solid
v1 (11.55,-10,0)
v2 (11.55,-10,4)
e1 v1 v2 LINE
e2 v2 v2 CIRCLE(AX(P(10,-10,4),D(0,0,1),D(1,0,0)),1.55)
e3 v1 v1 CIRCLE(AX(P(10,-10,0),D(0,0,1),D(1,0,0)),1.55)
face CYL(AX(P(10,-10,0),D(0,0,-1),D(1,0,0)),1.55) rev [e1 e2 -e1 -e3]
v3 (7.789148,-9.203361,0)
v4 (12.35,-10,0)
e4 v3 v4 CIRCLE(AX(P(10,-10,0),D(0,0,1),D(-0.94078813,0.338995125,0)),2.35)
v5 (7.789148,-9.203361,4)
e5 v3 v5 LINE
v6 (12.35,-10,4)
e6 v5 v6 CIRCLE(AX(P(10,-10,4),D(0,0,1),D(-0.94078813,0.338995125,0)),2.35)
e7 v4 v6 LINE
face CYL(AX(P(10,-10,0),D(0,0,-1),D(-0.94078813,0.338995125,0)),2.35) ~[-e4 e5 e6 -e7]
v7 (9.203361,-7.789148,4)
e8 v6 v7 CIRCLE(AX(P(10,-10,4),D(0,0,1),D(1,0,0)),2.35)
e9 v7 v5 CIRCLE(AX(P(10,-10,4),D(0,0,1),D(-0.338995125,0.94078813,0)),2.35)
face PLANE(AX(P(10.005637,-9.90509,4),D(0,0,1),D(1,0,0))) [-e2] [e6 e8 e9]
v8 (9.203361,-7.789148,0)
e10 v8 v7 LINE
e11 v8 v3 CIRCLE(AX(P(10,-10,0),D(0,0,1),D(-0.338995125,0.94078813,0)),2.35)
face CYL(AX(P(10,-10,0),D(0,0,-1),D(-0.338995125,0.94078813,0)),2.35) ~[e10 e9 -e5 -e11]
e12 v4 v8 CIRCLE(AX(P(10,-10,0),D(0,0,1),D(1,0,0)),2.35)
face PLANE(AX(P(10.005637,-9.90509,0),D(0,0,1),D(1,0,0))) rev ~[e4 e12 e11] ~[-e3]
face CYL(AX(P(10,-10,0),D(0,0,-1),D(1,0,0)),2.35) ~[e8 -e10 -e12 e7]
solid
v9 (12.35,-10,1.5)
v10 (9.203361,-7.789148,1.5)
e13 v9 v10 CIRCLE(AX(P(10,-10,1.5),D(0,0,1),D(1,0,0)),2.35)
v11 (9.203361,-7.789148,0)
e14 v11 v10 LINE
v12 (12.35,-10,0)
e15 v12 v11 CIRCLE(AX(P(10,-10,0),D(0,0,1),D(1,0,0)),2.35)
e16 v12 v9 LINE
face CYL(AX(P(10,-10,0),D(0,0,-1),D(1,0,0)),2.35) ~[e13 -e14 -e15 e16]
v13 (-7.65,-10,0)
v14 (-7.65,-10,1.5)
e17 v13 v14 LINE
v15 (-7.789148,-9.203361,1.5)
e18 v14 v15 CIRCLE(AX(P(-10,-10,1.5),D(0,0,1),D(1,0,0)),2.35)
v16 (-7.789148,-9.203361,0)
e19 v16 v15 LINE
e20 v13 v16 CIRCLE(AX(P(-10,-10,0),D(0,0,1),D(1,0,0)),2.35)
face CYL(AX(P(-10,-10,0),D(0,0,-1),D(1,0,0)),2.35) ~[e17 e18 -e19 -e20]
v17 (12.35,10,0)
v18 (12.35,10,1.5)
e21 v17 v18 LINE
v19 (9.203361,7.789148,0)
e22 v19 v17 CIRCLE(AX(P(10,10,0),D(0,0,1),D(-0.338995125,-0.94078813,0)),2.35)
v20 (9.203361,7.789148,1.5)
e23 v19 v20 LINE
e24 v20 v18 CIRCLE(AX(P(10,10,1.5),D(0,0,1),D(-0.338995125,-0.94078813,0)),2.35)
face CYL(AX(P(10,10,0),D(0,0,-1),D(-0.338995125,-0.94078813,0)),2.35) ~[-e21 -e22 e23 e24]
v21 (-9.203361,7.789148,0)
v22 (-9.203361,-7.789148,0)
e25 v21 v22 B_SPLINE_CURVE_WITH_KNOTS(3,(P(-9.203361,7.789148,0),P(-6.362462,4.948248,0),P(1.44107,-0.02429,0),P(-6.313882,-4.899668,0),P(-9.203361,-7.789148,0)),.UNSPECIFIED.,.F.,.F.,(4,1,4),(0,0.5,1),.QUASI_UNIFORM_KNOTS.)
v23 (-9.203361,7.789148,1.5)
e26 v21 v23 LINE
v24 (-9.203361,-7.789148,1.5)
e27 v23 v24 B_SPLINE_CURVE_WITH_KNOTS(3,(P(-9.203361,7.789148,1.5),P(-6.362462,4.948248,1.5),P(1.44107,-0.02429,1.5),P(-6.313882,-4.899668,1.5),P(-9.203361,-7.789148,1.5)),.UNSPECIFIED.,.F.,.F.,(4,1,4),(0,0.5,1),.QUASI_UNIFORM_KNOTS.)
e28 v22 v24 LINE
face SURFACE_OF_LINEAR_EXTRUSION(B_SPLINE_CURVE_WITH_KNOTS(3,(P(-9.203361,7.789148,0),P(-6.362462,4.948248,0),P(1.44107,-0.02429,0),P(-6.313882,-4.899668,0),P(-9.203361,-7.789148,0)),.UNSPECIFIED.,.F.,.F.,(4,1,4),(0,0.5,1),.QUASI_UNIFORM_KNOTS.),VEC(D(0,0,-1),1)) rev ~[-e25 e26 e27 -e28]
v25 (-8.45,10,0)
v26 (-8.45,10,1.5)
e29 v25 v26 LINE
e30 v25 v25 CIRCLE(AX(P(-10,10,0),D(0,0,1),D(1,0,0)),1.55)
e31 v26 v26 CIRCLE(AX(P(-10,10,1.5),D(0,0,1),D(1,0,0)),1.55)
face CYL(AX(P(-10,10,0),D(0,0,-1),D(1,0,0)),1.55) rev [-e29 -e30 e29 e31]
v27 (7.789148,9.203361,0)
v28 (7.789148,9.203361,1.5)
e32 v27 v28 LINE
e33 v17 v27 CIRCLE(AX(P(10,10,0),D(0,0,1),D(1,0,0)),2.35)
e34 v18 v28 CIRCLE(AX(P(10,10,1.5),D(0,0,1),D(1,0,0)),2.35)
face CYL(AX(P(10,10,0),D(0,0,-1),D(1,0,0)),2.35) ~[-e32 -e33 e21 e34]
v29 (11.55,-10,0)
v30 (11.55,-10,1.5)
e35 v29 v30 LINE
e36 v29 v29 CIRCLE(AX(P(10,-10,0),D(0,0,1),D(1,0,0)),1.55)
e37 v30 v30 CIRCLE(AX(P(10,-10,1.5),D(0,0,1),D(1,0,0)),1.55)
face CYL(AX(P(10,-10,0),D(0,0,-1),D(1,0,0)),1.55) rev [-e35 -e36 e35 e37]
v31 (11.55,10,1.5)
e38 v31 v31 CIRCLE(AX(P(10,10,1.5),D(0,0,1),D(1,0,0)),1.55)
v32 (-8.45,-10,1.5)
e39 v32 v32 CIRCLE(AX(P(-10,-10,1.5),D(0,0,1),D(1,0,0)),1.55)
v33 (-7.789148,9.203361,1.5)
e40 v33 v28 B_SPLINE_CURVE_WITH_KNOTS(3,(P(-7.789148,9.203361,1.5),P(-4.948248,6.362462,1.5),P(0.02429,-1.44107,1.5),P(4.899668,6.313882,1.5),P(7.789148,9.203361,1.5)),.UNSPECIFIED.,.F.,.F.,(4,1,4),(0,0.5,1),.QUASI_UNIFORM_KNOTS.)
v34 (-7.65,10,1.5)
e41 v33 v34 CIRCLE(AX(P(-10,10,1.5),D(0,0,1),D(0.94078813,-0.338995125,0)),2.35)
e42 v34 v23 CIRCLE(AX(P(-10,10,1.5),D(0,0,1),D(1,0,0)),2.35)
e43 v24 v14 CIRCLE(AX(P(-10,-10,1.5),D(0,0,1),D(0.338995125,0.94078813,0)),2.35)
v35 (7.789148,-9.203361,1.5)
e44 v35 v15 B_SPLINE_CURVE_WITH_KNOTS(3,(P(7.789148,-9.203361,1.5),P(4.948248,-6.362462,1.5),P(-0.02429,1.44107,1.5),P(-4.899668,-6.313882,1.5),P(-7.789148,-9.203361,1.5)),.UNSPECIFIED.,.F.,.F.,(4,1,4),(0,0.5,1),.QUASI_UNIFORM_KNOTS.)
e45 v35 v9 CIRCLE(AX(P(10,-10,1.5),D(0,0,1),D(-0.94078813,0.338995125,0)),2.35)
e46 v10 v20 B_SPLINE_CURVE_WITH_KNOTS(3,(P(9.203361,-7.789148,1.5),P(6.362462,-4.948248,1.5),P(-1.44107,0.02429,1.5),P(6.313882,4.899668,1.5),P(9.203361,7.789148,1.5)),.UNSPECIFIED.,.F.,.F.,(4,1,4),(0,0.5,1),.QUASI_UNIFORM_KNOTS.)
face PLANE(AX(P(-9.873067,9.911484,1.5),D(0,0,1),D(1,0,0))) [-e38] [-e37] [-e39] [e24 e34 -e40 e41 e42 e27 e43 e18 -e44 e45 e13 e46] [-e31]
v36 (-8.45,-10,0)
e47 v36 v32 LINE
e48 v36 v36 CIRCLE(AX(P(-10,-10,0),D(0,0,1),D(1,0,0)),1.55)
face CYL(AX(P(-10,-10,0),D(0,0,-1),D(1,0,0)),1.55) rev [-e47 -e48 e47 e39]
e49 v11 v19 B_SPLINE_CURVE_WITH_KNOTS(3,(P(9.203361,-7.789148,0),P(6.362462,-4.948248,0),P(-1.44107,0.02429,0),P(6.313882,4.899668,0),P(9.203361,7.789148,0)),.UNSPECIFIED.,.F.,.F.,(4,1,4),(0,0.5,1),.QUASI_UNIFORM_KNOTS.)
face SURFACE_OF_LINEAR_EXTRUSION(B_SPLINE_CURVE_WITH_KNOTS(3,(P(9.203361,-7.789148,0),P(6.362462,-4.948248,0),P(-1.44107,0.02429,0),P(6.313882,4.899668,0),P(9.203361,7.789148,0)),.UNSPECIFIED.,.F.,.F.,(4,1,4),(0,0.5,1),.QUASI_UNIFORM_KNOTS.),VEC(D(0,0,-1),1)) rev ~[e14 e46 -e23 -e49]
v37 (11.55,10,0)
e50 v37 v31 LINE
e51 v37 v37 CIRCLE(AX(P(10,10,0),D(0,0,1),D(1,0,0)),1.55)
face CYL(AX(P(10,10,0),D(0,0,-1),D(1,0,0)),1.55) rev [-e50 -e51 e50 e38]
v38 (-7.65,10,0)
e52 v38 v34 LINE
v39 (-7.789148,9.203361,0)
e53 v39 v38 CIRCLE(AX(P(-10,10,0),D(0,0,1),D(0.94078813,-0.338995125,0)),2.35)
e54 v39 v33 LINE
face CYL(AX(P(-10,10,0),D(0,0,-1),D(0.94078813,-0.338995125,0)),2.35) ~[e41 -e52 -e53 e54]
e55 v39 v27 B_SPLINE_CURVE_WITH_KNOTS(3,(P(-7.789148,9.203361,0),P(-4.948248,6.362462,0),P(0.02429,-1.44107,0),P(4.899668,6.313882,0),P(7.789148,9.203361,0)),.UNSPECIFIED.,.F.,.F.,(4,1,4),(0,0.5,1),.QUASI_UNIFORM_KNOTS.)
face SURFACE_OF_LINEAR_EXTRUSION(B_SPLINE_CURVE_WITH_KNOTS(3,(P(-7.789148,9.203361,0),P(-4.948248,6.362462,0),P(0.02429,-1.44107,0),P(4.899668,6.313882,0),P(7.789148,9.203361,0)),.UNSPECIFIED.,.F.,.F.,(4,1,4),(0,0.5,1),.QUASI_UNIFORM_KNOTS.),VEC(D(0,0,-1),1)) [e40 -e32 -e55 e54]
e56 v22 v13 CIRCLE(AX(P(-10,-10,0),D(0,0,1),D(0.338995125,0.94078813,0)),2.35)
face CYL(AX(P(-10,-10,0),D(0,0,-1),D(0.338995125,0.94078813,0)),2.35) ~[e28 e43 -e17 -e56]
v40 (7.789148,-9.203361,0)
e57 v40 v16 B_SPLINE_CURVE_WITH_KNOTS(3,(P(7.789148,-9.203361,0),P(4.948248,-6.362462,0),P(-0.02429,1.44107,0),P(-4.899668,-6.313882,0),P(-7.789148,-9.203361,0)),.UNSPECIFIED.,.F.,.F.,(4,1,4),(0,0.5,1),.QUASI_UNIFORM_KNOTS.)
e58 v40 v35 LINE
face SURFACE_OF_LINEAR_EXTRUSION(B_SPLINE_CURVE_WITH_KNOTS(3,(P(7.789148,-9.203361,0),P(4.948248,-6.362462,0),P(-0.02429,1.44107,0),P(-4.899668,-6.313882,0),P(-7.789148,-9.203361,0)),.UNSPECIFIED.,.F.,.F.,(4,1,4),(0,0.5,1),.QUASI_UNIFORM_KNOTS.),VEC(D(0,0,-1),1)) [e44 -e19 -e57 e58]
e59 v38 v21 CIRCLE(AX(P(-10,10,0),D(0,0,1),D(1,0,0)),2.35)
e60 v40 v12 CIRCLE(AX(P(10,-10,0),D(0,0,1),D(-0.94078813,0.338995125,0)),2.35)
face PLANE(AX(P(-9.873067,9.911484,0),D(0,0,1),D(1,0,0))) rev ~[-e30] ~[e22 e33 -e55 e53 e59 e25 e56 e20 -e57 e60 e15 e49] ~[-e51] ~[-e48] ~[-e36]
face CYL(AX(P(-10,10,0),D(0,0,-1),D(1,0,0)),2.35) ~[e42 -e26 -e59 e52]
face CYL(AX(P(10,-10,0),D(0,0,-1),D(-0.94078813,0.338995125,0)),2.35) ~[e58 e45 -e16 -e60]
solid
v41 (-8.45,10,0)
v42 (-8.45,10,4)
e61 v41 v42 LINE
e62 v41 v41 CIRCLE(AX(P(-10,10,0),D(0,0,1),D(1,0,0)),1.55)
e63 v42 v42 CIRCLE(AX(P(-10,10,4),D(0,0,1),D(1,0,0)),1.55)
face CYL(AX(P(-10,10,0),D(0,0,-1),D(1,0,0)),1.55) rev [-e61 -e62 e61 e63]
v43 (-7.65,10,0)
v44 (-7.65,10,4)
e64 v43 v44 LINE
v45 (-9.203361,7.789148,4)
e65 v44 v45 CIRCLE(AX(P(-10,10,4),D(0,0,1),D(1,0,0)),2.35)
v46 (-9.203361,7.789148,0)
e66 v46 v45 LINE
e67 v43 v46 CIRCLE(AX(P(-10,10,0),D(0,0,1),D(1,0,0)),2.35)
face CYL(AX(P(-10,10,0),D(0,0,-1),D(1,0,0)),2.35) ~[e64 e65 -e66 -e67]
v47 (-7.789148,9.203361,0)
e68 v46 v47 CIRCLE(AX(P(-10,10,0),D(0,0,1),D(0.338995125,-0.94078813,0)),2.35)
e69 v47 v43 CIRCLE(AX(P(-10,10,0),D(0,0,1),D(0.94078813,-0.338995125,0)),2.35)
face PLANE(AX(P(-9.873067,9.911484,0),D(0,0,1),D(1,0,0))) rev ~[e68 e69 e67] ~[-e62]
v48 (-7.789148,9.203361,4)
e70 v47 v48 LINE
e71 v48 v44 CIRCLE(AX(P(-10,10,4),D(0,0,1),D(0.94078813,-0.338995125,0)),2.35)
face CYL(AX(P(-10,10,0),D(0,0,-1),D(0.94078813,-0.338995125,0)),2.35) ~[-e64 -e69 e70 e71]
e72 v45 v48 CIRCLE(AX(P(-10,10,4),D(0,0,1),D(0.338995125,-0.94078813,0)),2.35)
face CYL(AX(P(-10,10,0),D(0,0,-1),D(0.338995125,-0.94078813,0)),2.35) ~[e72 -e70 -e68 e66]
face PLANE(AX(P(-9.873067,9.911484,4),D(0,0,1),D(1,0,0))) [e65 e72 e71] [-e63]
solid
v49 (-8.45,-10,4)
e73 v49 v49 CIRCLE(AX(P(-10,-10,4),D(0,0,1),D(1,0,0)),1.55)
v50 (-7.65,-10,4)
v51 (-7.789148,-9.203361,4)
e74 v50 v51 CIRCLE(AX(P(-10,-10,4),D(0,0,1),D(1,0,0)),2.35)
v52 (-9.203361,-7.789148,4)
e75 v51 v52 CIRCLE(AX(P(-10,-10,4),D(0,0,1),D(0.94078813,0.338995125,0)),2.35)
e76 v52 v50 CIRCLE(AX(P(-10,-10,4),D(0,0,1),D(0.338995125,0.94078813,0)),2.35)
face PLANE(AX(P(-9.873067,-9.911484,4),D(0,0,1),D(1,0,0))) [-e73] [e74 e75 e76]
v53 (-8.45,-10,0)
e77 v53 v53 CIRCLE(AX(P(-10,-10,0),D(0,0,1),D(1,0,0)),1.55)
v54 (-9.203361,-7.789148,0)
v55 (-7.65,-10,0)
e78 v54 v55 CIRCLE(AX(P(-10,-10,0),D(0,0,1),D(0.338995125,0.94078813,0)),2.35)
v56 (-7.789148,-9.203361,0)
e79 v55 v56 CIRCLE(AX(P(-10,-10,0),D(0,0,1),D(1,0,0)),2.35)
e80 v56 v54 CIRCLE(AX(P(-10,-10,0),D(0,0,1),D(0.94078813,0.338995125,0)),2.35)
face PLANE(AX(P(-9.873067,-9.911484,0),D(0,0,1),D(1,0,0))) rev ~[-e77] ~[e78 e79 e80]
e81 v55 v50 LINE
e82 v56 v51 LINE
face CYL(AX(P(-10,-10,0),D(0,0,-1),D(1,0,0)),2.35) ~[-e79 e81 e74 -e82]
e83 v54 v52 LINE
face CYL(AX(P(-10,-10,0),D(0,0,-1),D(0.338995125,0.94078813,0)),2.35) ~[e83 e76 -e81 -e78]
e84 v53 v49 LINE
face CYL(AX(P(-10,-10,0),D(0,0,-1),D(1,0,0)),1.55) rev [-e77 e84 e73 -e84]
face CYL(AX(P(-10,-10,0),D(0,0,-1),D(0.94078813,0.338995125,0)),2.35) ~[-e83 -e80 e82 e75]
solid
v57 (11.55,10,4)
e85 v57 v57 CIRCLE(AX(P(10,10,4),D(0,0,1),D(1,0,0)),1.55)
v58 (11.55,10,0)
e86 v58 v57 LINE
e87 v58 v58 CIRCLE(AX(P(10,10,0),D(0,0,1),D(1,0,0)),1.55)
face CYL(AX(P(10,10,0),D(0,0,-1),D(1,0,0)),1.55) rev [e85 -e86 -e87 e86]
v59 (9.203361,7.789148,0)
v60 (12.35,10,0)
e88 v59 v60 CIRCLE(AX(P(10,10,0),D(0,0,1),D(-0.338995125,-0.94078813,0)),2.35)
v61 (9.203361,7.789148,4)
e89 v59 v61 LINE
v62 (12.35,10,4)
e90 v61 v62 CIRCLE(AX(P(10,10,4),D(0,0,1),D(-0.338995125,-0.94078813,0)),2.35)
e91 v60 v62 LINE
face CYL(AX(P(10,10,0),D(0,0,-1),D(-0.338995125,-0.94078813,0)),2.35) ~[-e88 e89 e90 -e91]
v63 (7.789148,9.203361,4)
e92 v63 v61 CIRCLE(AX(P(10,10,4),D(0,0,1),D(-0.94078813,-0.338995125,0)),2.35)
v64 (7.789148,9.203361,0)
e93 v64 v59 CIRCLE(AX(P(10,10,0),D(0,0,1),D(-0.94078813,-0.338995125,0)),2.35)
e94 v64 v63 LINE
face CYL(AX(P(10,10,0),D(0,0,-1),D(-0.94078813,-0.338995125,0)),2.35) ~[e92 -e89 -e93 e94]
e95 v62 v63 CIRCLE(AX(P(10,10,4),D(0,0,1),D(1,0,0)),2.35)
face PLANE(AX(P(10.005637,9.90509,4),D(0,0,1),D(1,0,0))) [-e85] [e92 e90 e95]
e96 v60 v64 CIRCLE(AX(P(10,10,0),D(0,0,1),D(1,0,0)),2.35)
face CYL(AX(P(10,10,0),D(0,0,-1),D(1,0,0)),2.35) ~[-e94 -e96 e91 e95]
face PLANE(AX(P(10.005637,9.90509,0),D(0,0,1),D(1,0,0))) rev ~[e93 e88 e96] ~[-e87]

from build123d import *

# Parameters (mm, degrees)
F0_R     = 1.55
F1_DEPTH = 4
F2_DEPTH = 1.5


with BuildPart() as f1:
    # F0 (on Top) → F1 (new body)
    with BuildSketch(Plane.XY):
        with BuildLine():
            ThreePointArc((-7.7891478946, 9.203361457), (-7.6850483323, 9.5956501809), (-7.65, 10))
            ThreePointArc((-7.65, 10), (-11.9228365214, 11.3509995233), (-9.203361457, 7.7891478946))
            ThreePointArc((-9.203361457, 7.7891478946), (-8.3382990642, 8.3382990642), (-7.7891478946, 9.203361457))
        make_face()
        with Locations((-10, 10)):
            Circle(F0_R, mode=Mode.SUBTRACT)
    extrude(amount=F1_DEPTH)


with BuildPart() as f1b:
    # F0 (on Top) → F1, piece 2 (new body)
    with BuildSketch(Plane.XY):
        with BuildLine():
            ThreePointArc((-7.7891478946, -9.203361457), (-8.3382990642, -8.3382990642), (-9.203361457, -7.7891478946))
            ThreePointArc((-9.203361457, -7.7891478946), (-11.9228365214, -11.3509995233), (-7.65, -10))
            ThreePointArc((-7.65, -10), (-7.6850483323, -9.5956501809), (-7.7891478946, -9.203361457))
        make_face()
        with Locations((-10, -10)):
            Circle(F0_R, mode=Mode.SUBTRACT)
    extrude(amount=F1_DEPTH)


with BuildPart() as f1c:
    # F0 (on Top) → F1, piece 3 (new body)
    with BuildSketch(Plane.XY):
        with BuildLine():
            ThreePointArc((12.35, 10), (9.5956501809, 12.3149516677), (7.7891478946, 9.203361457))
            ThreePointArc((7.7891478946, 9.203361457), (8.3382990642, 8.3382990642), (9.203361457, 7.7891478946))
            ThreePointArc((9.203361457, 7.7891478946), (11.3509995233, 8.0771634786), (12.35, 10))
        make_face()
        with Locations((10, 10)):
            Circle(F0_R, mode=Mode.SUBTRACT)
    extrude(amount=F1_DEPTH)


with BuildPart() as f1d:
    # F0 (on Top) → F1, piece 4 (new body)
    with BuildSketch(Plane.XY):
        with BuildLine():
            ThreePointArc((9.203361457, -7.7891478946), (8.3382990642, -8.3382990642), (7.7891478946, -9.203361457))
            ThreePointArc((7.7891478946, -9.203361457), (9.5956501809, -12.3149516677), (12.35, -10))
            ThreePointArc((12.35, -10), (11.3509995233, -8.0771634786), (9.203361457, -7.7891478946))
        make_face()
        with Locations((10, -10)):
            Circle(F0_R, mode=Mode.SUBTRACT)
    extrude(amount=F1_DEPTH)


with BuildPart() as f2:
    # F0 (on Top) → F2 (new body)
    with BuildSketch(Plane.XY):
        with BuildLine():
            ThreePointArc((-7.7891478946, 9.203361457), (-7.6850483323, 9.5956501809), (-7.65, 10))
            ThreePointArc((-7.65, 10), (-11.9228365214, 11.3509995233), (-9.203361457, 7.7891478946))
            ThreePointArc((-9.203361457, 7.7891478946), (-8.3382990642, 8.3382990642), (-7.7891478946, 9.203361457))
        make_face()
        with Locations((-10, 10)):
            Circle(F0_R, mode=Mode.SUBTRACT)
        with BuildLine():
            ThreePointArc((-7.7891478946, 9.203361457), (-8.3382990642, 8.3382990642), (-9.203361457, 7.7891478946))
            add(Edge.make_bspline(
                [(-9.203361457, 7.7891478946), (-6.3624616014, 4.948248039), (1.441069995, -0.0242898241), (-6.3138819532, -4.8996683909), (-9.203361457, -7.7891478946)],
                knots=[0, 0, 0, 0, 0.5, 1, 1, 1, 1], degree=3))
            ThreePointArc((-9.203361457, -7.7891478946), (-8.3382990642, -8.3382990642), (-7.7891478946, -9.203361457))
            add(Edge.make_bspline(
                [(7.7891478946, -9.203361457), (4.948248039, -6.3624616014), (-0.0242898241, 1.441069995), (-4.8996683909, -6.3138819532), (-7.7891478946, -9.203361457)],
                knots=[0, 0, 0, 0, 0.5, 1, 1, 1, 1], degree=3))
            ThreePointArc((7.7891478946, -9.203361457), (8.3382990642, -8.3382990642), (9.203361457, -7.7891478946))
            add(Edge.make_bspline(
                [(9.203361457, -7.7891478946), (6.3624616014, -4.948248039), (-1.441069995, 0.0242898241), (6.3138819532, 4.8996683909), (9.203361457, 7.7891478946)],
                knots=[0, 0, 0, 0, 0.5, 1, 1, 1, 1], degree=3))
            ThreePointArc((9.203361457, 7.7891478946), (8.3382990642, 8.3382990642), (7.7891478946, 9.203361457))
            add(Edge.make_bspline(
                [(-7.7891478946, 9.203361457), (-4.948248039, 6.3624616014), (0.0242898241, -1.441069995), (4.8996683909, 6.3138819532), (7.7891478946, 9.203361457)],
                knots=[0, 0, 0, 0, 0.5, 1, 1, 1, 1], degree=3))
        make_face()
        with BuildLine():
            ThreePointArc((-7.7891478946, -9.203361457), (-8.3382990642, -8.3382990642), (-9.203361457, -7.7891478946))
            ThreePointArc((-9.203361457, -7.7891478946), (-11.9228365214, -11.3509995233), (-7.65, -10))
            ThreePointArc((-7.65, -10), (-7.6850483323, -9.5956501809), (-7.7891478946, -9.203361457))
        make_face()
        with Locations((-10, -10)):
            Circle(F0_R, mode=Mode.SUBTRACT)
        with BuildLine():
            ThreePointArc((12.35, 10), (9.5956501809, 12.3149516677), (7.7891478946, 9.203361457))
            ThreePointArc((7.7891478946, 9.203361457), (8.3382990642, 8.3382990642), (9.203361457, 7.7891478946))
            ThreePointArc((9.203361457, 7.7891478946), (11.3509995233, 8.0771634786), (12.35, 10))
        make_face()
        with Locations((10, 10)):
            Circle(F0_R, mode=Mode.SUBTRACT)
        with BuildLine():
            ThreePointArc((9.203361457, -7.7891478946), (8.3382990642, -8.3382990642), (7.7891478946, -9.203361457))
            ThreePointArc((7.7891478946, -9.203361457), (9.5956501809, -12.3149516677), (12.35, -10))
            ThreePointArc((12.35, -10), (11.3509995233, -8.0771634786), (9.203361457, -7.7891478946))
        make_face()
        with Locations((10, -10)):
            Circle(F0_R, mode=Mode.SUBTRACT)
    extrude(amount=F2_DEPTH)


solid = Compound([f1.part, f1b.part, f1c.part, f1d.part, f2.part])
